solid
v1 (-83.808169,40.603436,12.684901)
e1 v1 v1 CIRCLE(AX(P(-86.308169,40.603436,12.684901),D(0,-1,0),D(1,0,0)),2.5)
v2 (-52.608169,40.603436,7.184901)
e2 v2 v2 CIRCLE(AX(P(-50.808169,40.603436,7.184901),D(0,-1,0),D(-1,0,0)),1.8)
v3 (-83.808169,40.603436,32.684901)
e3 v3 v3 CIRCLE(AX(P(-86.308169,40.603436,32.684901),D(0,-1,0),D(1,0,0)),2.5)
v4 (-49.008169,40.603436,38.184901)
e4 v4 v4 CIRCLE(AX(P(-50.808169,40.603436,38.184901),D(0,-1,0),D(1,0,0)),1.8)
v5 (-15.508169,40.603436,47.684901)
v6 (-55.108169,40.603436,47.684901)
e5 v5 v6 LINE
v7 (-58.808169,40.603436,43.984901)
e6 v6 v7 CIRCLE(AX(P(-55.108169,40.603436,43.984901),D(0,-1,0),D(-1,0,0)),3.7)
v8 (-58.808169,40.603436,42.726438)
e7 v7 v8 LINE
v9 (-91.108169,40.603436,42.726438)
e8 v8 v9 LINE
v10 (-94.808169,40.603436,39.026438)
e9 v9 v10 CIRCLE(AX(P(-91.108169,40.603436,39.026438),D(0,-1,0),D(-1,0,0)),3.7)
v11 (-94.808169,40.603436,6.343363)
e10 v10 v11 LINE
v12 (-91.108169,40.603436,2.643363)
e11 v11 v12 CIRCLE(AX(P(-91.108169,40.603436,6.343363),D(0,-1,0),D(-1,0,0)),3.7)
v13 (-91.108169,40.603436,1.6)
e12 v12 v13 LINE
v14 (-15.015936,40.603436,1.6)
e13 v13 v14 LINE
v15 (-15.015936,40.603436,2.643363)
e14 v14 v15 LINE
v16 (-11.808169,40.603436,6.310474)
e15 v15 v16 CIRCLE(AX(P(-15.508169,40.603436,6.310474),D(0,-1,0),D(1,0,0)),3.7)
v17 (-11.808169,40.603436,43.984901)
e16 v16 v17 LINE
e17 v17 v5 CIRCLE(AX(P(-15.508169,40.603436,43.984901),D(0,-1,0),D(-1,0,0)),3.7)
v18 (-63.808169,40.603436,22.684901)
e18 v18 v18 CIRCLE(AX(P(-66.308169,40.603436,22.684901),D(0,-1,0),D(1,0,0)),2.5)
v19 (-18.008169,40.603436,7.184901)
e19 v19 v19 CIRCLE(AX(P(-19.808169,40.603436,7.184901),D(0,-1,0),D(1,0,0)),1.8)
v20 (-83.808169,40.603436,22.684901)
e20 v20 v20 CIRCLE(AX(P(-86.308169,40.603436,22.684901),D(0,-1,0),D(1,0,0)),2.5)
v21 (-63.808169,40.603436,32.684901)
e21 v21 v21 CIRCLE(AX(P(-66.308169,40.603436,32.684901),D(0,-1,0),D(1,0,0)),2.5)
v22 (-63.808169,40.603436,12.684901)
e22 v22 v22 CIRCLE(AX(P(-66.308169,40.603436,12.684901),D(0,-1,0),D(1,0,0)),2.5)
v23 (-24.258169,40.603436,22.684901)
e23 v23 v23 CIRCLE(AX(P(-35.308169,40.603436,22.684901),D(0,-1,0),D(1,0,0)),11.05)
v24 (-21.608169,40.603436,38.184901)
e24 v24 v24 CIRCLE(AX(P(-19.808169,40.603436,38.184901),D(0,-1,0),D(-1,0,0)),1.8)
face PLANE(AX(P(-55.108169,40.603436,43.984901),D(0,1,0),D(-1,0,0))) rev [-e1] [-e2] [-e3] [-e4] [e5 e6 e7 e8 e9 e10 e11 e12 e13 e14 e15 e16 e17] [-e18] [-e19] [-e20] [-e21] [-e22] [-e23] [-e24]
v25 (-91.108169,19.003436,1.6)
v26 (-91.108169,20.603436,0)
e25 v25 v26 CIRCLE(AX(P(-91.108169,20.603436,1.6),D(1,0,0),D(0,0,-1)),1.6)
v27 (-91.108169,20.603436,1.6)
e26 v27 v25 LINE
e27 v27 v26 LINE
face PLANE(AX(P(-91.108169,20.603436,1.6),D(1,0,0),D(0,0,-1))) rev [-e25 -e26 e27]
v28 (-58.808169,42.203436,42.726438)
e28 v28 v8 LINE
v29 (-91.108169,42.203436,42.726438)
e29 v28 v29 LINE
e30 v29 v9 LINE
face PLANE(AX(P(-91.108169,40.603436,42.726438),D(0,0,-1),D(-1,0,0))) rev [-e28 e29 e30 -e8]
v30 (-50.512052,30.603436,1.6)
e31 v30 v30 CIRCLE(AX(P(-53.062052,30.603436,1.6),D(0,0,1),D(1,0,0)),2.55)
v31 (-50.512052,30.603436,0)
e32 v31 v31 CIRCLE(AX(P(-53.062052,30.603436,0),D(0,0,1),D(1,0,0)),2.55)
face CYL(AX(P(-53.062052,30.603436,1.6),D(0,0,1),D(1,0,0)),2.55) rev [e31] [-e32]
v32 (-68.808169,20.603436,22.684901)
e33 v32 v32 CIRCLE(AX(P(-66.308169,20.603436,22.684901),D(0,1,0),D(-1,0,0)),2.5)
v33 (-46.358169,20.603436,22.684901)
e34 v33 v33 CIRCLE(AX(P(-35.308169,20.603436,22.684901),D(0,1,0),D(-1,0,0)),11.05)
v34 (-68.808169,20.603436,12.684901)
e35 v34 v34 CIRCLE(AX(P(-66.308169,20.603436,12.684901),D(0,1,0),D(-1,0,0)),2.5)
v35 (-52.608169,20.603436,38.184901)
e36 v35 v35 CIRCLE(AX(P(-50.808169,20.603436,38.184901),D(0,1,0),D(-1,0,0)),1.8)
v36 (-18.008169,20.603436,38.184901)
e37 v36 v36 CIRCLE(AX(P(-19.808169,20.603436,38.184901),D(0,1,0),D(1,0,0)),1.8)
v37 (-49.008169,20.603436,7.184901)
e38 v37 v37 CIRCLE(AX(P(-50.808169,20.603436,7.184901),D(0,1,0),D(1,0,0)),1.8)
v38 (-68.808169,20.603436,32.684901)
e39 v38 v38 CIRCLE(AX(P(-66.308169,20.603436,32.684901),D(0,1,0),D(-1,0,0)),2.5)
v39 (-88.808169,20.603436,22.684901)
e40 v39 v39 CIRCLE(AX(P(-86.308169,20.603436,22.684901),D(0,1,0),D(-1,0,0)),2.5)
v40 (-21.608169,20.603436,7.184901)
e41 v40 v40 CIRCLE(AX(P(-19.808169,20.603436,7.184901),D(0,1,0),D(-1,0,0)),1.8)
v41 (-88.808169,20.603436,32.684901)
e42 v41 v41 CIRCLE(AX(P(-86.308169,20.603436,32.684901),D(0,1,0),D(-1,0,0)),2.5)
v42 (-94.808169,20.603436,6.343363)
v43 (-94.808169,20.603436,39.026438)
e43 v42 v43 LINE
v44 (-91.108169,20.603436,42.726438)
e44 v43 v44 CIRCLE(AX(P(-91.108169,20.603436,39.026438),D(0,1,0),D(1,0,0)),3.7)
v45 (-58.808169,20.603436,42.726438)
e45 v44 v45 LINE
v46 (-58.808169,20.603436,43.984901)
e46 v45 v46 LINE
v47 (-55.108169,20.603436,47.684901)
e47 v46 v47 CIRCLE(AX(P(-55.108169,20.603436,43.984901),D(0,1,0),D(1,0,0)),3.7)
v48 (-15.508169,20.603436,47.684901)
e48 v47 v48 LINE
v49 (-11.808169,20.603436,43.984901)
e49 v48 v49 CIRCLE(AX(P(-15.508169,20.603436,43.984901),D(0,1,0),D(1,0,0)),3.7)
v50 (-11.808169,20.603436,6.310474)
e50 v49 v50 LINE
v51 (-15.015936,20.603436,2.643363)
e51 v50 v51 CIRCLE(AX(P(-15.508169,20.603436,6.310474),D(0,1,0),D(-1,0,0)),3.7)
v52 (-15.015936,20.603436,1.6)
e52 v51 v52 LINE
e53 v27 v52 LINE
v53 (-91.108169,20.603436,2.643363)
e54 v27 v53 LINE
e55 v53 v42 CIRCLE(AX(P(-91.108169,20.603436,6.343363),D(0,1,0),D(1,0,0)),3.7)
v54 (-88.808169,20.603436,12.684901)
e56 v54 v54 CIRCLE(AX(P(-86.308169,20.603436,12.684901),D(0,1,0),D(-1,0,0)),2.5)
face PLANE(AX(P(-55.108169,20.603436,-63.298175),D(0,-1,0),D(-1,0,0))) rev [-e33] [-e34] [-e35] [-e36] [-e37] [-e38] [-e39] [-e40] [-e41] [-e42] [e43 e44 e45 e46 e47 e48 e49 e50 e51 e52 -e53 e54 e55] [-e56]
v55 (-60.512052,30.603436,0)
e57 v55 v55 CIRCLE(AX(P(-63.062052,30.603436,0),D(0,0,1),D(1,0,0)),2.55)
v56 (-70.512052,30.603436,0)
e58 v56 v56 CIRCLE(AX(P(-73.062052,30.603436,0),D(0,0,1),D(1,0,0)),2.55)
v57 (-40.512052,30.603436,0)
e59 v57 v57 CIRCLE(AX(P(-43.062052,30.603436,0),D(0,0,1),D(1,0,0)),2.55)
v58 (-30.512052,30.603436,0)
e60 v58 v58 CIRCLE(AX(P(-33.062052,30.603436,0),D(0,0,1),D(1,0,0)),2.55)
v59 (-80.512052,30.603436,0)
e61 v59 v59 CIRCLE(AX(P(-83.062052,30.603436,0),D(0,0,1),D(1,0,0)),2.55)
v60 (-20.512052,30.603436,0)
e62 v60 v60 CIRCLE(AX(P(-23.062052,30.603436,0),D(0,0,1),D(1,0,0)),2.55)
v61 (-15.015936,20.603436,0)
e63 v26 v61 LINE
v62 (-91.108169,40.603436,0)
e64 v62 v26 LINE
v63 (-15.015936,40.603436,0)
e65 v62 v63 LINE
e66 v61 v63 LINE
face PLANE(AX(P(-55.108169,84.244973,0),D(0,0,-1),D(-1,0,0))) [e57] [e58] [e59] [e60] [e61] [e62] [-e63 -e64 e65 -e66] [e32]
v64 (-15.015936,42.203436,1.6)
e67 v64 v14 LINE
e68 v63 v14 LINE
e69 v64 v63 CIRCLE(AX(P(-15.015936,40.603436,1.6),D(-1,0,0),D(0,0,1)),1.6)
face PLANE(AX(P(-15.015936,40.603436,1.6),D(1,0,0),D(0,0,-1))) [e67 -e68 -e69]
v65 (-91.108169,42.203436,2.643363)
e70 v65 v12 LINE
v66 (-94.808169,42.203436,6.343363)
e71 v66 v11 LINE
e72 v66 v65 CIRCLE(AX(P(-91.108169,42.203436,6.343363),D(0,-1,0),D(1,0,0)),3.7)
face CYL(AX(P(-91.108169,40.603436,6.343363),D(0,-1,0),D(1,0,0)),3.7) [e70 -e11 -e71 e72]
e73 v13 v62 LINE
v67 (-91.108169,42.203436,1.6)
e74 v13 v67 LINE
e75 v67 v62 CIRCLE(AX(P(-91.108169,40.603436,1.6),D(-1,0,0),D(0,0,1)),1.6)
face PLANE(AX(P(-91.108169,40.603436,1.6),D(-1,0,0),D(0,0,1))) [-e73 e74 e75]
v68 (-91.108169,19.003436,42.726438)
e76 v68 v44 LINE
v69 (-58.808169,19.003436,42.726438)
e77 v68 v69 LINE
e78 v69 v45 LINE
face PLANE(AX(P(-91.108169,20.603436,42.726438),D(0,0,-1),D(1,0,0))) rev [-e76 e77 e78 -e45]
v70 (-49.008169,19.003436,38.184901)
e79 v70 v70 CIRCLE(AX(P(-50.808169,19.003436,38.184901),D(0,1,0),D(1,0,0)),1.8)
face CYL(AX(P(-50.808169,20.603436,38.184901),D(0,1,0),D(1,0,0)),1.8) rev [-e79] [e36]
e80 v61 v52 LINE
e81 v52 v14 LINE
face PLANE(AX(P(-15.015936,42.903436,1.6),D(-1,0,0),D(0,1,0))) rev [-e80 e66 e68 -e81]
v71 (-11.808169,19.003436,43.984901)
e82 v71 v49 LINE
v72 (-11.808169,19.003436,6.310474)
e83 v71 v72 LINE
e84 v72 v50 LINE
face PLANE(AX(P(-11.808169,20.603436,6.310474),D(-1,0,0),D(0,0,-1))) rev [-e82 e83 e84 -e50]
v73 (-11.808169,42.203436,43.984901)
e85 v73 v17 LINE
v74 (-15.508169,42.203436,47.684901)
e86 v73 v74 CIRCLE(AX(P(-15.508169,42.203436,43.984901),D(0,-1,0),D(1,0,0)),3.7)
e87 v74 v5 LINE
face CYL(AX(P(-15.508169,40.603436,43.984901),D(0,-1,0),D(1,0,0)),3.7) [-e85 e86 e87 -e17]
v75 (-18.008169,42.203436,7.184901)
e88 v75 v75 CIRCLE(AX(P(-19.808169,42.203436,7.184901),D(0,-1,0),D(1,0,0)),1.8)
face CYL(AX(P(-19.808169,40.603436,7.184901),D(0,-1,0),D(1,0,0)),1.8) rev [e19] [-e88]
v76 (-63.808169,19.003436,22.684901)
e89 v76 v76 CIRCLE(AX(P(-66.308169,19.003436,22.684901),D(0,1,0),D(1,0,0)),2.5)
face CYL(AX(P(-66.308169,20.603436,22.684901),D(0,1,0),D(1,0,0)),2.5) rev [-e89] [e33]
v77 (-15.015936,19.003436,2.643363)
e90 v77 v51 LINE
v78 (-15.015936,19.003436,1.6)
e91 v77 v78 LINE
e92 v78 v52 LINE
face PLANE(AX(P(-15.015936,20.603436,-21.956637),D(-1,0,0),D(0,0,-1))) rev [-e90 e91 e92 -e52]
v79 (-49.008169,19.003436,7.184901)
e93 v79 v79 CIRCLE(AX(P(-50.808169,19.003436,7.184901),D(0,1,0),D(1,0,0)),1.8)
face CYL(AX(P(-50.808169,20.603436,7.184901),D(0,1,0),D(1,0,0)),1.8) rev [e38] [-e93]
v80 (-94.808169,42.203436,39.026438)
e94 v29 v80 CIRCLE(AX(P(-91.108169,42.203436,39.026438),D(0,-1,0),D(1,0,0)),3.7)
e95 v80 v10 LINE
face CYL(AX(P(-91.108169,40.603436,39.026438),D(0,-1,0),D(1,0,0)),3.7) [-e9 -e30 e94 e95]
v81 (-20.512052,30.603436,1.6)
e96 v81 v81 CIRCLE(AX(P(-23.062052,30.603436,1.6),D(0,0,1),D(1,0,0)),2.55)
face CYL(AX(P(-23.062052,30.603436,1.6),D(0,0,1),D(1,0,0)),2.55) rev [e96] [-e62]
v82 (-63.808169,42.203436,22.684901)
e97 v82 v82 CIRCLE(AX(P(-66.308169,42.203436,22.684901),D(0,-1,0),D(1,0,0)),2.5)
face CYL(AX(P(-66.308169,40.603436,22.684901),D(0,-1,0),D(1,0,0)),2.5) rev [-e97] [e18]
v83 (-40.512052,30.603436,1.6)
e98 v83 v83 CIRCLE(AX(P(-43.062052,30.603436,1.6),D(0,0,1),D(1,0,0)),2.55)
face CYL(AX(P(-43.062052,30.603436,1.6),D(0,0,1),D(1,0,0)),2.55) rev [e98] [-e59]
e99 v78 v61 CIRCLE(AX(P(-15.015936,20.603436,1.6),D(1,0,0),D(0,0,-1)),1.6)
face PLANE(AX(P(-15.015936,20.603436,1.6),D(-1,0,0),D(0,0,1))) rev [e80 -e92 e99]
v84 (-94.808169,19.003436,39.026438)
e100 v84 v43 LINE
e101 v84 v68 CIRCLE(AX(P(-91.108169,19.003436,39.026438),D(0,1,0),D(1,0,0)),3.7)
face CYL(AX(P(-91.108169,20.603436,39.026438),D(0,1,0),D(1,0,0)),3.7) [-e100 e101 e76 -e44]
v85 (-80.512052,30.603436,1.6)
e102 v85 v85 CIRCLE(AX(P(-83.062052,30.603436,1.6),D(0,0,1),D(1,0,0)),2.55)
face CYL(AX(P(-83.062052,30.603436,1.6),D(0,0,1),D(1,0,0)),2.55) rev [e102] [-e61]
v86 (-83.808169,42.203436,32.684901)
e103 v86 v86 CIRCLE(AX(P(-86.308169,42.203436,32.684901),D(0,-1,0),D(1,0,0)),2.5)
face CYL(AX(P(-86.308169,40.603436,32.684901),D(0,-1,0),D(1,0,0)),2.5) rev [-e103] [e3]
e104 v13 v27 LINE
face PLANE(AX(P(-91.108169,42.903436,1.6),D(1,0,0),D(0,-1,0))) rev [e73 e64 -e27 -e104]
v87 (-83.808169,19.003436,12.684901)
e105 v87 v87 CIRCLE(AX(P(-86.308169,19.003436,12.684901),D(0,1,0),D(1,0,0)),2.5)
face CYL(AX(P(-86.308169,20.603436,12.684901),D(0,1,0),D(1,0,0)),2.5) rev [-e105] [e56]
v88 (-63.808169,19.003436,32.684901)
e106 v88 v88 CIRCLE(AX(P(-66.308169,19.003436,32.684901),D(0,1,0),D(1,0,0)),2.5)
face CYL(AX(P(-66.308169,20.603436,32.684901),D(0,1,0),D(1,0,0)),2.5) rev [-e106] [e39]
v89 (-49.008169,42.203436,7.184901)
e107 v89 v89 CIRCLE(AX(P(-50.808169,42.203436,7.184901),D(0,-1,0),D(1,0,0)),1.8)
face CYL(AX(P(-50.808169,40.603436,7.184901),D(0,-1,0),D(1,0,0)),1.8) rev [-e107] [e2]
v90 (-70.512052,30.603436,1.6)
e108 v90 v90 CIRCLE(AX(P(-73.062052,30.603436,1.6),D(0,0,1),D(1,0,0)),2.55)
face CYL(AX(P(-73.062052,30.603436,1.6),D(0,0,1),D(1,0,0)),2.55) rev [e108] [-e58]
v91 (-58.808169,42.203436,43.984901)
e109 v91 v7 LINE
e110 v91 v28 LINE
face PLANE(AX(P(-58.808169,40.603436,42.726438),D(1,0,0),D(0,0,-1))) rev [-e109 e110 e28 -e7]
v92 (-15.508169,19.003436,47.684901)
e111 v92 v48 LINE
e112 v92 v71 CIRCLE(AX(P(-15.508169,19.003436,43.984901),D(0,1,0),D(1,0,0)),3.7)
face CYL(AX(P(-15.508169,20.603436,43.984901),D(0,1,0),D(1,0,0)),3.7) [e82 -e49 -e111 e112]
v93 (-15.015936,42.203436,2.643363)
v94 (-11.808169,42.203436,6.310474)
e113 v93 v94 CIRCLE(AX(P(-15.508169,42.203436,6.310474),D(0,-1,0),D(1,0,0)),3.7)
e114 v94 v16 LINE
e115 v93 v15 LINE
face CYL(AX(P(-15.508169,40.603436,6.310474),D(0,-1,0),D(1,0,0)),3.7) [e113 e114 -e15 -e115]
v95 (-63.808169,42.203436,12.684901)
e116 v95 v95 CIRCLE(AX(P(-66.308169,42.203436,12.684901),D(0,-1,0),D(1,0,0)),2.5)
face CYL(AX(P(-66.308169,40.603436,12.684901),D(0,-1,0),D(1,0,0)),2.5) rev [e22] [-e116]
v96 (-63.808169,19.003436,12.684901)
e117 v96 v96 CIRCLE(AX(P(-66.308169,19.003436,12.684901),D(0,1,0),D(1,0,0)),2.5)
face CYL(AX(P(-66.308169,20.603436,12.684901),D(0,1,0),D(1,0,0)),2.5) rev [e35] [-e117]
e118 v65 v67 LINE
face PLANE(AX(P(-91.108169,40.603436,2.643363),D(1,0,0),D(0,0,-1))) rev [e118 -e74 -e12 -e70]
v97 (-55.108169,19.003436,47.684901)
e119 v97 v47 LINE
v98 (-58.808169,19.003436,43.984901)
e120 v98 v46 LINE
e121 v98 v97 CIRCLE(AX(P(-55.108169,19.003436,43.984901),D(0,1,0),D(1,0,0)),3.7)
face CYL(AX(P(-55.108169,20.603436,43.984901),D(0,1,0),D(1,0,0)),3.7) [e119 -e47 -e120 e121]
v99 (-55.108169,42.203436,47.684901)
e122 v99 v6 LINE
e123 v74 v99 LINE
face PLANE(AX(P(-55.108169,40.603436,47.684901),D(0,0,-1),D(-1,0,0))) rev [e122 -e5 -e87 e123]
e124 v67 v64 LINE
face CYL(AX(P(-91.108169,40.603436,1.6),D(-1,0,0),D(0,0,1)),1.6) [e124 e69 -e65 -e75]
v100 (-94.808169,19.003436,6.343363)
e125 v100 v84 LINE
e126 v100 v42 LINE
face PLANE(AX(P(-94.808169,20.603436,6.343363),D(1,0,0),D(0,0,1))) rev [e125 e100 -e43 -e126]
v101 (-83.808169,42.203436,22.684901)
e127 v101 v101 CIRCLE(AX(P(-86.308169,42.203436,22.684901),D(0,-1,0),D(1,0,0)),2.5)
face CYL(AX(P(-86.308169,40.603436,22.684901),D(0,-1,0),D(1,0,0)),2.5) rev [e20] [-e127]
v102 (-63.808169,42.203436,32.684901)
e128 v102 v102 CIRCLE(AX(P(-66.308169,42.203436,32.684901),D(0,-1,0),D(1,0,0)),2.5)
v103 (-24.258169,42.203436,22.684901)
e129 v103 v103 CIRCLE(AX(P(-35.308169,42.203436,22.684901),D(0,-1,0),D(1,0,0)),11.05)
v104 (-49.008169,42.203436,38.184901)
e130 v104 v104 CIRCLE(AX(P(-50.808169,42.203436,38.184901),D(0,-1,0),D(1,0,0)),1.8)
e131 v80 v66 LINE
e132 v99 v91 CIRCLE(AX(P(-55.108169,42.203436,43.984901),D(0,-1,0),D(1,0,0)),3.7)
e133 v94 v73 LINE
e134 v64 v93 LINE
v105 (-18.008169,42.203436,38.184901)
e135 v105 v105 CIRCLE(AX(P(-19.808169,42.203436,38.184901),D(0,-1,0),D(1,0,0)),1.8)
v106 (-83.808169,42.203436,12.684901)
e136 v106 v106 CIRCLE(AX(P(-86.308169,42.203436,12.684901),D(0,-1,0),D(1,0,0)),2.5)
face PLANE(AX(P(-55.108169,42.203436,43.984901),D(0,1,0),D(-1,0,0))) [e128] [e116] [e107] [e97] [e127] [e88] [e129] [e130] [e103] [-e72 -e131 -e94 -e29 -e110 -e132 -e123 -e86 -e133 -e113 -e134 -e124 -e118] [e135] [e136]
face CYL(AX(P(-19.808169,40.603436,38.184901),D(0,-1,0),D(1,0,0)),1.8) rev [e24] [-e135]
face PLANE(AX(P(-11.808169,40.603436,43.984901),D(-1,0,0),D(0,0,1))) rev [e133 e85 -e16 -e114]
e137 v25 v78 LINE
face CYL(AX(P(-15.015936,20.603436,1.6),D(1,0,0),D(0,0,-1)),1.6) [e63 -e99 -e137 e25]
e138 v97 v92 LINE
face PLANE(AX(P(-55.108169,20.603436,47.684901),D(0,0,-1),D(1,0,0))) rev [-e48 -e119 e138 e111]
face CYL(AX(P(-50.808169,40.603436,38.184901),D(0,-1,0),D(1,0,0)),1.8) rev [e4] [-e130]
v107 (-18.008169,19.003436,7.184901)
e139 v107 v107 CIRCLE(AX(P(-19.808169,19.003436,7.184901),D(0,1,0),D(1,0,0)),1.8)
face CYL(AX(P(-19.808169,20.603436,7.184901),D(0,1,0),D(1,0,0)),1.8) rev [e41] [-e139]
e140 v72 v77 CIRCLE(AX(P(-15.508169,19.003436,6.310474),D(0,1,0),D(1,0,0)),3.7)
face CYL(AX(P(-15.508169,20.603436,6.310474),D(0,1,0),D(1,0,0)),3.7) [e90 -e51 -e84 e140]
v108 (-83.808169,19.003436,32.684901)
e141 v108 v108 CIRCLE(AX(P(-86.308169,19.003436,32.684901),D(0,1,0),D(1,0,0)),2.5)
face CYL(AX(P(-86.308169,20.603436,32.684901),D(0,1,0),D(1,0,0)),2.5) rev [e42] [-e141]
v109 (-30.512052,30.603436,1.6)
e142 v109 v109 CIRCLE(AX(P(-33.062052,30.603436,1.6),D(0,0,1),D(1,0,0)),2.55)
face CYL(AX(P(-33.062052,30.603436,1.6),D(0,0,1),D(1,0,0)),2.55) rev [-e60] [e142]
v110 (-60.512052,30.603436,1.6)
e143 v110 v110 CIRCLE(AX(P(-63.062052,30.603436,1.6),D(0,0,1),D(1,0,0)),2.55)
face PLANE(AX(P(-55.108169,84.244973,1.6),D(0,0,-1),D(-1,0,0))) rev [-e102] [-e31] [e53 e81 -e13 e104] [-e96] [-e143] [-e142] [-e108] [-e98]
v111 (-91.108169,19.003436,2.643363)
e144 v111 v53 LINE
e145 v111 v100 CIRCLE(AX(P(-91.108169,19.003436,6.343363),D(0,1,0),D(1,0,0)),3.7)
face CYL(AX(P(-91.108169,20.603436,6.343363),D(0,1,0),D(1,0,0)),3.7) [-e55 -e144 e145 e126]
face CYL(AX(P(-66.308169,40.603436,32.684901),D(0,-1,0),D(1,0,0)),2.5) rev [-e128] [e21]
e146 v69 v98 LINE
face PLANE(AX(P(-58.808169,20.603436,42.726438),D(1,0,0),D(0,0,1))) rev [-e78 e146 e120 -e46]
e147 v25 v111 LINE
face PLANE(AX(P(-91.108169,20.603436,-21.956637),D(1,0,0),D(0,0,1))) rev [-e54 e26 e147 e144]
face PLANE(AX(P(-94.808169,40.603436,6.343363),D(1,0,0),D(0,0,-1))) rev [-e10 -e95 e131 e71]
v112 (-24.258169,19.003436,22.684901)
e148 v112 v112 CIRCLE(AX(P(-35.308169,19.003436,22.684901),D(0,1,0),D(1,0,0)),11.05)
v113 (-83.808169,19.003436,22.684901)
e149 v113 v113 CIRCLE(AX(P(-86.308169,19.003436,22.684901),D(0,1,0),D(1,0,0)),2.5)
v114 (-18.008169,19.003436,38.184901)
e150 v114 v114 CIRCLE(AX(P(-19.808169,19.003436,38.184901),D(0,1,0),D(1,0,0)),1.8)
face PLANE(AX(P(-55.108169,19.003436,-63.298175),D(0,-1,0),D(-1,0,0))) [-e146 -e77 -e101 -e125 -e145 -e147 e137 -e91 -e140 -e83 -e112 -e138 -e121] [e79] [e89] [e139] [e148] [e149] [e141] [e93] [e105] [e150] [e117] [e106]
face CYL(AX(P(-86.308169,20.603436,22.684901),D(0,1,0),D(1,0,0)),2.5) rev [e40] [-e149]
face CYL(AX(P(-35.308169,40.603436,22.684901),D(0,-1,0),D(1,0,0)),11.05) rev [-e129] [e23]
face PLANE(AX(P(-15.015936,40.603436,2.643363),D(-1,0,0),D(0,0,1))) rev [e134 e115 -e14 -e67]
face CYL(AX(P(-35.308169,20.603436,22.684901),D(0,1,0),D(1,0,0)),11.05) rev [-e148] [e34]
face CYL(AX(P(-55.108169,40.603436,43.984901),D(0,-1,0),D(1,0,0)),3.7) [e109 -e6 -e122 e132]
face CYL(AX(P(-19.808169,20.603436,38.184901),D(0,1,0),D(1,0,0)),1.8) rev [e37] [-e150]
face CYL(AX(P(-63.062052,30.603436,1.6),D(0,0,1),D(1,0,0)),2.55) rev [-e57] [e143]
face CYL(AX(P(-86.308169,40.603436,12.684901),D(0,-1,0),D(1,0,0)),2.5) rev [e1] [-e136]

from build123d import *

# Parameters (mm, degrees)
SKETCH1_R                    = 2.5
SKETCH1_R_2                  = 1.8
SKETCH1_R_3                  = 2.55
SKETCH1_R_4                  = 11.05
BOSS_EXTRUDE1_DEPTH          = 1.6
SKETCHED_START               = -26.738102053
SKETCHED_BEND1_OUTLINE_W     = 83
SKETCHED_BEND1_OUTLINE_H     = 1.6
SKETCHED_BEND1_DEPTH         = 45.741537679
SKETCHED_START_2             = 42.203435626
SKETCHED_BEND1_2_OUTLINE_W   = 83
SKETCHED_BEND1_2_OUTLINE_H   = 1.6
SKETCHED_BEND1_2_DEPTH       = 45.741537678
SKETCHED_START_3             = 19.003435626
SKETCHED_BEND1_3_OUTLINE_R   = 2.5
SKETCHED_BEND1_3_OUTLINE_R_2 = 1.8
SKETCHED_BEND1_3_OUTLINE_R_3 = 11.05
SKETCHED_BEND1_3_DEPTH       = 1.6
SKETCHED_START_4             = 40.603435626
SKETCHED_BEND1_4_OUTLINE_R   = 2.5
SKETCHED_BEND1_4_OUTLINE_R_2 = 1.8
SKETCHED_BEND1_4_OUTLINE_R_3 = 11.05
SKETCHED_BEND1_4_DEPTH       = 1.6
SKETCHED_START_5             = -92
SKETCHED_BEND1_5_DEPTH       = 78


with BuildPart() as part:
    # Sketch1 → Boss-Extrude1 (new body)
    with BuildSketch(Plane.XY):
        with BuildLine():
            Line((-91.108168831, 42.903435626), (-91.108168831, 18.303435626))
            ThreePointArc((-91.108168831, 18.303435626), (-93.724463922, 17.219730716), (-94.808168831, 14.603435626))
            Line((-94.808168831, 14.603435626), (-94.808168831, -18.079639731))
            ThreePointArc((-94.808168831, -18.079639731), (-93.724463922, -20.695934821), (-91.108168831, -21.779639731))
            Line((-91.108168831, -21.779639731), (-58.808168831, -21.779639731))
            Line((-58.808168831, -21.779639731), (-58.808168831, -23.038102053))
            ThreePointArc((-58.808168831, -23.038102053), (-57.724463922, -25.654397143), (-55.108168831, -26.738102053))
            Line((-55.108168831, -26.738102053), (-15.508168831, -26.738102053))
            ThreePointArc((-15.508168831, -26.738102053), (-12.891873741, -25.654397143), (-11.808168831, -23.038102053))
            Line((-11.808168831, -23.038102053), (-11.808168831, 14.636324152))
            ThreePointArc((-11.808168831, 14.636324152), (-12.723275427, 17.072380131), (-15.015935712, 18.303435626))
            Line((-15.015935712, 18.303435626), (-15.015935712, 42.903435626))
            ThreePointArc((-15.015935712, 42.903435626), (-12.723275427, 44.13449112), (-11.808168831, 46.570547099))
            Line((-11.808168831, 46.570547099), (-11.808168831, 84.244973304))
            ThreePointArc((-11.808168831, 84.244973304), (-12.891873741, 86.861268394), (-15.508168831, 87.944973304))
            Line((-15.508168831, 87.944973304), (-55.108168831, 87.944973304))
            ThreePointArc((-55.108168831, 87.944973304), (-57.724463922, 86.861268394), (-58.808168831, 84.244973304))
            Line((-58.808168831, 84.244973304), (-58.808168831, 82.986510982))
            Line((-58.808168831, 82.986510982), (-91.108168831, 82.986510982))
            ThreePointArc((-91.108168831, 82.986510982), (-93.724463922, 81.902806072), (-94.808168831, 79.286510982))
            Line((-94.808168831, 79.286510982), (-94.808168831, 46.603435626))
            ThreePointArc((-94.808168831, 46.603435626), (-93.724463922, 43.987140535), (-91.108168831, 42.903435626))
        make_face()
        with Locations((-66.308168831, 72.944973304)):
            Circle(SKETCH1_R, mode=Mode.SUBTRACT)
        with Locations((-50.808168831, 78.444973304)):
            Circle(SKETCH1_R_2, mode=Mode.SUBTRACT)
        with Locations(Location((-19.808168831, 78.444973304, 0), (0, 0, 180))):
            Circle(SKETCH1_R_2, mode=Mode.SUBTRACT)
        with Locations((-19.808168831, 47.444973304)):
            Circle(SKETCH1_R_2, mode=Mode.SUBTRACT)
        with Locations(Location((-50.808168831, 47.444973304, 0), (0, 0, 180))):
            Circle(SKETCH1_R_2, mode=Mode.SUBTRACT)
        with Locations((-86.308168831, 72.944973304)):
            Circle(SKETCH1_R, mode=Mode.SUBTRACT)
        with Locations((-66.308168831, 62.944973304)):
            Circle(SKETCH1_R, mode=Mode.SUBTRACT)
        with Locations((-66.308168831, 52.944973304)):
            Circle(SKETCH1_R, mode=Mode.SUBTRACT)
        with Locations((-86.308168831, 62.944973304)):
            Circle(SKETCH1_R, mode=Mode.SUBTRACT)
        with Locations((-53.062052272, 30.603435626)):
            Circle(SKETCH1_R_3, mode=Mode.SUBTRACT)
        with Locations((-43.062052272, 30.603435626)):
            Circle(SKETCH1_R_3, mode=Mode.SUBTRACT)
        with Locations((-33.062052272, 30.603435626)):
            Circle(SKETCH1_R_3, mode=Mode.SUBTRACT)
        with Locations((-23.062052272, 30.603435626)):
            Circle(SKETCH1_R_3, mode=Mode.SUBTRACT)
        with Locations((-63.062052272, 30.603435626)):
            Circle(SKETCH1_R_3, mode=Mode.SUBTRACT)
        with Locations((-73.062052272, 30.603435626)):
            Circle(SKETCH1_R_3, mode=Mode.SUBTRACT)
        with Locations((-83.062052272, 30.603435626)):
            Circle(SKETCH1_R_3, mode=Mode.SUBTRACT)
        with Locations((-35.308168831, 62.944973304)):
            Circle(SKETCH1_R_4, mode=Mode.SUBTRACT)
        with Locations((-86.308168831, 52.944973304)):
            Circle(SKETCH1_R, mode=Mode.SUBTRACT)
        with Locations(Location((-35.308168831, -1.738102053, 0), (0, 0, 180))):
            Circle(SKETCH1_R_4, mode=Mode.SUBTRACT)
        with Locations((-19.808168831, -17.238102053)):
            Circle(SKETCH1_R_2, mode=Mode.SUBTRACT)
        with Locations(Location((-19.808168831, 13.761897947, 0), (0, 0, 180))):
            Circle(SKETCH1_R_2, mode=Mode.SUBTRACT)
        with Locations((-50.808168831, 13.761897947)):
            Circle(SKETCH1_R_2, mode=Mode.SUBTRACT)
        with Locations(Location((-50.808168831, -17.238102053, 0), (0, 0, 180))):
            Circle(SKETCH1_R_2, mode=Mode.SUBTRACT)
        with Locations(Location((-66.308168831, -11.738102053, 0), (0, 0, 180))):
            Circle(SKETCH1_R, mode=Mode.SUBTRACT)
        with Locations(Location((-66.308168831, -1.738102053, 0), (0, 0, 180))):
            Circle(SKETCH1_R, mode=Mode.SUBTRACT)
        with Locations(Location((-66.308168831, 8.261897947, 0), (0, 0, 180))):
            Circle(SKETCH1_R, mode=Mode.SUBTRACT)
        with Locations(Location((-86.308168831, 8.261897947, 0), (0, 0, 180))):
            Circle(SKETCH1_R, mode=Mode.SUBTRACT)
        with Locations(Location((-86.308168831, -1.738102053, 0), (0, 0, 180))):
            Circle(SKETCH1_R, mode=Mode.SUBTRACT)
        with Locations(Location((-86.308168831, -11.738102053, 0), (0, 0, 180))):
            Circle(SKETCH1_R, mode=Mode.SUBTRACT)
    extrude(amount=BOSS_EXTRUDE1_DEPTH)

    # Sketched Bend1: read off the stored shape, not the designer's step
    # Sketched Bend1 outline → Sketched Bend1 (cut)
    with BuildSketch(Plane(origin=(0, 0, 0), x_dir=(1, 0, 0), z_dir=(0, 1, 0)).offset(SKETCHED_START)):
        with Locations((-53.308168831, -0.8)):
            Rectangle(SKETCHED_BEND1_OUTLINE_W, SKETCHED_BEND1_OUTLINE_H)
    extrude(amount=SKETCHED_BEND1_DEPTH, mode=Mode.SUBTRACT)

    # Sketched Bend1 2 outline → Sketched Bend1 2 (cut)
    with BuildSketch(Plane(origin=(0, 0, 0), x_dir=(1, 0, 0), z_dir=(0, 1, 0)).offset(SKETCHED_START_2)):
        with Locations((-53.308168831, -0.8)):
            Rectangle(SKETCHED_BEND1_2_OUTLINE_W, SKETCHED_BEND1_2_OUTLINE_H)
    extrude(amount=SKETCHED_BEND1_2_DEPTH, mode=Mode.SUBTRACT)

    # Sketched Bend1 3 outline → Sketched Bend1 3 (add)
    with BuildSketch(Plane(origin=(0, 0, 0), x_dir=(1, 0, 0), z_dir=(0, 1, 0)).offset(SKETCHED_START_3)):
        with BuildLine():
            Line((-15.015935712, -2.643362939), (-15.015935712, -1.6))
            Line((-15.015935712, -1.6), (-91.108168831, -1.6))
            Line((-91.108168831, -1.6), (-91.108168831, -2.643362939))
            ThreePointArc((-91.108168831, -2.643362939), (-93.724463922, -3.727067848), (-94.808168831, -6.343362939))
            Line((-94.808168831, -6.343362939), (-94.808168831, -39.026438295))
            ThreePointArc((-94.808168831, -39.026438295), (-93.724463922, -41.642733385), (-91.108168831, -42.726438295))
            Line((-91.108168831, -42.726438295), (-58.808168831, -42.726438295))
            Line((-58.808168831, -42.726438295), (-58.808168831, -43.984900617))
            ThreePointArc((-58.808168831, -43.984900617), (-57.724463922, -46.601195708), (-55.108168831, -47.684900617))
            Line((-55.108168831, -47.684900617), (-15.508168831, -47.684900617))
            ThreePointArc((-15.508168831, -47.684900617), (-12.891873741, -46.601195707), (-11.808168831, -43.984900617))
            Line((-11.808168831, -43.984900617), (-11.808168831, -6.310474412))
            ThreePointArc((-11.808168831, -6.310474412), (-12.723275427, -3.874418433), (-15.015935712, -2.643362939))
        make_face()
        with Locations((-86.308168831, -32.684900617)):
            Circle(SKETCHED_BEND1_3_OUTLINE_R, mode=Mode.SUBTRACT)
        with Locations((-66.308168831, -32.684900617)):
            Circle(SKETCHED_BEND1_3_OUTLINE_R, mode=Mode.SUBTRACT)
        with Locations((-50.808168831, -38.184900617)):
            Circle(SKETCHED_BEND1_3_OUTLINE_R_2, mode=Mode.SUBTRACT)
        with Locations((-19.808168831, -38.184900617)):
            Circle(SKETCHED_BEND1_3_OUTLINE_R_2, mode=Mode.SUBTRACT)
        with Locations((-86.308168831, -22.684900617)):
            Circle(SKETCHED_BEND1_3_OUTLINE_R, mode=Mode.SUBTRACT)
        with Locations((-86.308168831, -12.684900617)):
            Circle(SKETCHED_BEND1_3_OUTLINE_R, mode=Mode.SUBTRACT)
        with Locations((-66.308168831, -22.684900617)):
            Circle(SKETCHED_BEND1_3_OUTLINE_R, mode=Mode.SUBTRACT)
        with Locations((-66.308168831, -12.684900617)):
            Circle(SKETCHED_BEND1_3_OUTLINE_R, mode=Mode.SUBTRACT)
        with Locations((-35.308168831, -22.684900617)):
            Circle(SKETCHED_BEND1_3_OUTLINE_R_3, mode=Mode.SUBTRACT)
        with Locations((-50.808168831, -7.184900617)):
            Circle(SKETCHED_BEND1_3_OUTLINE_R_2, mode=Mode.SUBTRACT)
        with Locations((-19.808168831, -7.184900617)):
            Circle(SKETCHED_BEND1_3_OUTLINE_R_2, mode=Mode.SUBTRACT)
    extrude(amount=SKETCHED_BEND1_3_DEPTH)

    # Sketched Bend1 4 outline → Sketched Bend1 4 (add)
    with BuildSketch(Plane(origin=(0, 0, 0), x_dir=(1, 0, 0), z_dir=(0, 1, 0)).offset(SKETCHED_START_4)):
        with BuildLine():
            Line((-15.015935712, -2.643362939), (-15.015935712, -1.6))
            Line((-15.015935712, -1.6), (-91.108168831, -1.6))
            Line((-91.108168831, -1.6), (-91.108168831, -2.643362939))
            ThreePointArc((-91.108168831, -2.643362939), (-93.724463922, -3.727067848), (-94.808168831, -6.343362939))
            Line((-94.808168831, -6.343362939), (-94.808168831, -39.026438295))
            ThreePointArc((-94.808168831, -39.026438295), (-93.724463922, -41.642733385), (-91.108168831, -42.726438295))
            Line((-91.108168831, -42.726438295), (-58.808168831, -42.726438295))
            Line((-58.808168831, -42.726438295), (-58.808168831, -43.984900617))
            ThreePointArc((-58.808168831, -43.984900617), (-57.724463922, -46.601195708), (-55.108168831, -47.684900617))
            Line((-55.108168831, -47.684900617), (-15.508168831, -47.684900617))
            ThreePointArc((-15.508168831, -47.684900617), (-12.891873741, -46.601195707), (-11.808168831, -43.984900617))
            Line((-11.808168831, -43.984900617), (-11.808168831, -6.310474412))
            ThreePointArc((-11.808168831, -6.310474412), (-12.723275427, -3.874418433), (-15.015935712, -2.643362939))
        make_face()
        with Locations((-86.308168831, -32.684900617)):
            Circle(SKETCHED_BEND1_4_OUTLINE_R, mode=Mode.SUBTRACT)
        with Locations((-66.308168831, -32.684900617)):
            Circle(SKETCHED_BEND1_4_OUTLINE_R, mode=Mode.SUBTRACT)
        with Locations((-50.808168831, -38.184900617)):
            Circle(SKETCHED_BEND1_4_OUTLINE_R_2, mode=Mode.SUBTRACT)
        with Locations((-19.808168831, -38.184900617)):
            Circle(SKETCHED_BEND1_4_OUTLINE_R_2, mode=Mode.SUBTRACT)
        with Locations((-86.308168831, -22.684900617)):
            Circle(SKETCHED_BEND1_4_OUTLINE_R, mode=Mode.SUBTRACT)
        with Locations((-86.308168831, -12.684900617)):
            Circle(SKETCHED_BEND1_4_OUTLINE_R, mode=Mode.SUBTRACT)
        with Locations((-66.308168831, -22.684900617)):
            Circle(SKETCHED_BEND1_4_OUTLINE_R, mode=Mode.SUBTRACT)
        with Locations((-66.308168831, -12.684900617)):
            Circle(SKETCHED_BEND1_4_OUTLINE_R, mode=Mode.SUBTRACT)
        with Locations((-35.308168831, -22.684900617)):
            Circle(SKETCHED_BEND1_4_OUTLINE_R_3, mode=Mode.SUBTRACT)
        with Locations((-50.808168831, -7.184900617)):
            Circle(SKETCHED_BEND1_4_OUTLINE_R_2, mode=Mode.SUBTRACT)
        with Locations((-19.808168831, -7.184900617)):
            Circle(SKETCHED_BEND1_4_OUTLINE_R_2, mode=Mode.SUBTRACT)
    extrude(amount=SKETCHED_BEND1_4_DEPTH)

    # Sketched Bend1 5 outline → Sketched Bend1 5 (cut)
    with BuildSketch(Plane.YZ.offset(SKETCHED_START_5)):
        with BuildLine():
            Line((42.203435626, 0), (42.203435626, 1.6))
            ThreePointArc((42.203435626, 1.6), (41.734806476, 0.46862915), (40.603435626, 0))
            Line((40.603435626, 0), (42.203435626, 0))
        make_face()
        with BuildLine():
            Line((19.003435626, 0), (20.603435626, 0))
            ThreePointArc((20.603435626, 0), (19.472064776, 0.46862915), (19.003435626, 1.6))
            Line((19.003435626, 1.6), (19.003435626, 0))
        make_face()
    extrude(amount=SKETCHED_BEND1_5_DEPTH, mode=Mode.SUBTRACT)


solid = part.part
